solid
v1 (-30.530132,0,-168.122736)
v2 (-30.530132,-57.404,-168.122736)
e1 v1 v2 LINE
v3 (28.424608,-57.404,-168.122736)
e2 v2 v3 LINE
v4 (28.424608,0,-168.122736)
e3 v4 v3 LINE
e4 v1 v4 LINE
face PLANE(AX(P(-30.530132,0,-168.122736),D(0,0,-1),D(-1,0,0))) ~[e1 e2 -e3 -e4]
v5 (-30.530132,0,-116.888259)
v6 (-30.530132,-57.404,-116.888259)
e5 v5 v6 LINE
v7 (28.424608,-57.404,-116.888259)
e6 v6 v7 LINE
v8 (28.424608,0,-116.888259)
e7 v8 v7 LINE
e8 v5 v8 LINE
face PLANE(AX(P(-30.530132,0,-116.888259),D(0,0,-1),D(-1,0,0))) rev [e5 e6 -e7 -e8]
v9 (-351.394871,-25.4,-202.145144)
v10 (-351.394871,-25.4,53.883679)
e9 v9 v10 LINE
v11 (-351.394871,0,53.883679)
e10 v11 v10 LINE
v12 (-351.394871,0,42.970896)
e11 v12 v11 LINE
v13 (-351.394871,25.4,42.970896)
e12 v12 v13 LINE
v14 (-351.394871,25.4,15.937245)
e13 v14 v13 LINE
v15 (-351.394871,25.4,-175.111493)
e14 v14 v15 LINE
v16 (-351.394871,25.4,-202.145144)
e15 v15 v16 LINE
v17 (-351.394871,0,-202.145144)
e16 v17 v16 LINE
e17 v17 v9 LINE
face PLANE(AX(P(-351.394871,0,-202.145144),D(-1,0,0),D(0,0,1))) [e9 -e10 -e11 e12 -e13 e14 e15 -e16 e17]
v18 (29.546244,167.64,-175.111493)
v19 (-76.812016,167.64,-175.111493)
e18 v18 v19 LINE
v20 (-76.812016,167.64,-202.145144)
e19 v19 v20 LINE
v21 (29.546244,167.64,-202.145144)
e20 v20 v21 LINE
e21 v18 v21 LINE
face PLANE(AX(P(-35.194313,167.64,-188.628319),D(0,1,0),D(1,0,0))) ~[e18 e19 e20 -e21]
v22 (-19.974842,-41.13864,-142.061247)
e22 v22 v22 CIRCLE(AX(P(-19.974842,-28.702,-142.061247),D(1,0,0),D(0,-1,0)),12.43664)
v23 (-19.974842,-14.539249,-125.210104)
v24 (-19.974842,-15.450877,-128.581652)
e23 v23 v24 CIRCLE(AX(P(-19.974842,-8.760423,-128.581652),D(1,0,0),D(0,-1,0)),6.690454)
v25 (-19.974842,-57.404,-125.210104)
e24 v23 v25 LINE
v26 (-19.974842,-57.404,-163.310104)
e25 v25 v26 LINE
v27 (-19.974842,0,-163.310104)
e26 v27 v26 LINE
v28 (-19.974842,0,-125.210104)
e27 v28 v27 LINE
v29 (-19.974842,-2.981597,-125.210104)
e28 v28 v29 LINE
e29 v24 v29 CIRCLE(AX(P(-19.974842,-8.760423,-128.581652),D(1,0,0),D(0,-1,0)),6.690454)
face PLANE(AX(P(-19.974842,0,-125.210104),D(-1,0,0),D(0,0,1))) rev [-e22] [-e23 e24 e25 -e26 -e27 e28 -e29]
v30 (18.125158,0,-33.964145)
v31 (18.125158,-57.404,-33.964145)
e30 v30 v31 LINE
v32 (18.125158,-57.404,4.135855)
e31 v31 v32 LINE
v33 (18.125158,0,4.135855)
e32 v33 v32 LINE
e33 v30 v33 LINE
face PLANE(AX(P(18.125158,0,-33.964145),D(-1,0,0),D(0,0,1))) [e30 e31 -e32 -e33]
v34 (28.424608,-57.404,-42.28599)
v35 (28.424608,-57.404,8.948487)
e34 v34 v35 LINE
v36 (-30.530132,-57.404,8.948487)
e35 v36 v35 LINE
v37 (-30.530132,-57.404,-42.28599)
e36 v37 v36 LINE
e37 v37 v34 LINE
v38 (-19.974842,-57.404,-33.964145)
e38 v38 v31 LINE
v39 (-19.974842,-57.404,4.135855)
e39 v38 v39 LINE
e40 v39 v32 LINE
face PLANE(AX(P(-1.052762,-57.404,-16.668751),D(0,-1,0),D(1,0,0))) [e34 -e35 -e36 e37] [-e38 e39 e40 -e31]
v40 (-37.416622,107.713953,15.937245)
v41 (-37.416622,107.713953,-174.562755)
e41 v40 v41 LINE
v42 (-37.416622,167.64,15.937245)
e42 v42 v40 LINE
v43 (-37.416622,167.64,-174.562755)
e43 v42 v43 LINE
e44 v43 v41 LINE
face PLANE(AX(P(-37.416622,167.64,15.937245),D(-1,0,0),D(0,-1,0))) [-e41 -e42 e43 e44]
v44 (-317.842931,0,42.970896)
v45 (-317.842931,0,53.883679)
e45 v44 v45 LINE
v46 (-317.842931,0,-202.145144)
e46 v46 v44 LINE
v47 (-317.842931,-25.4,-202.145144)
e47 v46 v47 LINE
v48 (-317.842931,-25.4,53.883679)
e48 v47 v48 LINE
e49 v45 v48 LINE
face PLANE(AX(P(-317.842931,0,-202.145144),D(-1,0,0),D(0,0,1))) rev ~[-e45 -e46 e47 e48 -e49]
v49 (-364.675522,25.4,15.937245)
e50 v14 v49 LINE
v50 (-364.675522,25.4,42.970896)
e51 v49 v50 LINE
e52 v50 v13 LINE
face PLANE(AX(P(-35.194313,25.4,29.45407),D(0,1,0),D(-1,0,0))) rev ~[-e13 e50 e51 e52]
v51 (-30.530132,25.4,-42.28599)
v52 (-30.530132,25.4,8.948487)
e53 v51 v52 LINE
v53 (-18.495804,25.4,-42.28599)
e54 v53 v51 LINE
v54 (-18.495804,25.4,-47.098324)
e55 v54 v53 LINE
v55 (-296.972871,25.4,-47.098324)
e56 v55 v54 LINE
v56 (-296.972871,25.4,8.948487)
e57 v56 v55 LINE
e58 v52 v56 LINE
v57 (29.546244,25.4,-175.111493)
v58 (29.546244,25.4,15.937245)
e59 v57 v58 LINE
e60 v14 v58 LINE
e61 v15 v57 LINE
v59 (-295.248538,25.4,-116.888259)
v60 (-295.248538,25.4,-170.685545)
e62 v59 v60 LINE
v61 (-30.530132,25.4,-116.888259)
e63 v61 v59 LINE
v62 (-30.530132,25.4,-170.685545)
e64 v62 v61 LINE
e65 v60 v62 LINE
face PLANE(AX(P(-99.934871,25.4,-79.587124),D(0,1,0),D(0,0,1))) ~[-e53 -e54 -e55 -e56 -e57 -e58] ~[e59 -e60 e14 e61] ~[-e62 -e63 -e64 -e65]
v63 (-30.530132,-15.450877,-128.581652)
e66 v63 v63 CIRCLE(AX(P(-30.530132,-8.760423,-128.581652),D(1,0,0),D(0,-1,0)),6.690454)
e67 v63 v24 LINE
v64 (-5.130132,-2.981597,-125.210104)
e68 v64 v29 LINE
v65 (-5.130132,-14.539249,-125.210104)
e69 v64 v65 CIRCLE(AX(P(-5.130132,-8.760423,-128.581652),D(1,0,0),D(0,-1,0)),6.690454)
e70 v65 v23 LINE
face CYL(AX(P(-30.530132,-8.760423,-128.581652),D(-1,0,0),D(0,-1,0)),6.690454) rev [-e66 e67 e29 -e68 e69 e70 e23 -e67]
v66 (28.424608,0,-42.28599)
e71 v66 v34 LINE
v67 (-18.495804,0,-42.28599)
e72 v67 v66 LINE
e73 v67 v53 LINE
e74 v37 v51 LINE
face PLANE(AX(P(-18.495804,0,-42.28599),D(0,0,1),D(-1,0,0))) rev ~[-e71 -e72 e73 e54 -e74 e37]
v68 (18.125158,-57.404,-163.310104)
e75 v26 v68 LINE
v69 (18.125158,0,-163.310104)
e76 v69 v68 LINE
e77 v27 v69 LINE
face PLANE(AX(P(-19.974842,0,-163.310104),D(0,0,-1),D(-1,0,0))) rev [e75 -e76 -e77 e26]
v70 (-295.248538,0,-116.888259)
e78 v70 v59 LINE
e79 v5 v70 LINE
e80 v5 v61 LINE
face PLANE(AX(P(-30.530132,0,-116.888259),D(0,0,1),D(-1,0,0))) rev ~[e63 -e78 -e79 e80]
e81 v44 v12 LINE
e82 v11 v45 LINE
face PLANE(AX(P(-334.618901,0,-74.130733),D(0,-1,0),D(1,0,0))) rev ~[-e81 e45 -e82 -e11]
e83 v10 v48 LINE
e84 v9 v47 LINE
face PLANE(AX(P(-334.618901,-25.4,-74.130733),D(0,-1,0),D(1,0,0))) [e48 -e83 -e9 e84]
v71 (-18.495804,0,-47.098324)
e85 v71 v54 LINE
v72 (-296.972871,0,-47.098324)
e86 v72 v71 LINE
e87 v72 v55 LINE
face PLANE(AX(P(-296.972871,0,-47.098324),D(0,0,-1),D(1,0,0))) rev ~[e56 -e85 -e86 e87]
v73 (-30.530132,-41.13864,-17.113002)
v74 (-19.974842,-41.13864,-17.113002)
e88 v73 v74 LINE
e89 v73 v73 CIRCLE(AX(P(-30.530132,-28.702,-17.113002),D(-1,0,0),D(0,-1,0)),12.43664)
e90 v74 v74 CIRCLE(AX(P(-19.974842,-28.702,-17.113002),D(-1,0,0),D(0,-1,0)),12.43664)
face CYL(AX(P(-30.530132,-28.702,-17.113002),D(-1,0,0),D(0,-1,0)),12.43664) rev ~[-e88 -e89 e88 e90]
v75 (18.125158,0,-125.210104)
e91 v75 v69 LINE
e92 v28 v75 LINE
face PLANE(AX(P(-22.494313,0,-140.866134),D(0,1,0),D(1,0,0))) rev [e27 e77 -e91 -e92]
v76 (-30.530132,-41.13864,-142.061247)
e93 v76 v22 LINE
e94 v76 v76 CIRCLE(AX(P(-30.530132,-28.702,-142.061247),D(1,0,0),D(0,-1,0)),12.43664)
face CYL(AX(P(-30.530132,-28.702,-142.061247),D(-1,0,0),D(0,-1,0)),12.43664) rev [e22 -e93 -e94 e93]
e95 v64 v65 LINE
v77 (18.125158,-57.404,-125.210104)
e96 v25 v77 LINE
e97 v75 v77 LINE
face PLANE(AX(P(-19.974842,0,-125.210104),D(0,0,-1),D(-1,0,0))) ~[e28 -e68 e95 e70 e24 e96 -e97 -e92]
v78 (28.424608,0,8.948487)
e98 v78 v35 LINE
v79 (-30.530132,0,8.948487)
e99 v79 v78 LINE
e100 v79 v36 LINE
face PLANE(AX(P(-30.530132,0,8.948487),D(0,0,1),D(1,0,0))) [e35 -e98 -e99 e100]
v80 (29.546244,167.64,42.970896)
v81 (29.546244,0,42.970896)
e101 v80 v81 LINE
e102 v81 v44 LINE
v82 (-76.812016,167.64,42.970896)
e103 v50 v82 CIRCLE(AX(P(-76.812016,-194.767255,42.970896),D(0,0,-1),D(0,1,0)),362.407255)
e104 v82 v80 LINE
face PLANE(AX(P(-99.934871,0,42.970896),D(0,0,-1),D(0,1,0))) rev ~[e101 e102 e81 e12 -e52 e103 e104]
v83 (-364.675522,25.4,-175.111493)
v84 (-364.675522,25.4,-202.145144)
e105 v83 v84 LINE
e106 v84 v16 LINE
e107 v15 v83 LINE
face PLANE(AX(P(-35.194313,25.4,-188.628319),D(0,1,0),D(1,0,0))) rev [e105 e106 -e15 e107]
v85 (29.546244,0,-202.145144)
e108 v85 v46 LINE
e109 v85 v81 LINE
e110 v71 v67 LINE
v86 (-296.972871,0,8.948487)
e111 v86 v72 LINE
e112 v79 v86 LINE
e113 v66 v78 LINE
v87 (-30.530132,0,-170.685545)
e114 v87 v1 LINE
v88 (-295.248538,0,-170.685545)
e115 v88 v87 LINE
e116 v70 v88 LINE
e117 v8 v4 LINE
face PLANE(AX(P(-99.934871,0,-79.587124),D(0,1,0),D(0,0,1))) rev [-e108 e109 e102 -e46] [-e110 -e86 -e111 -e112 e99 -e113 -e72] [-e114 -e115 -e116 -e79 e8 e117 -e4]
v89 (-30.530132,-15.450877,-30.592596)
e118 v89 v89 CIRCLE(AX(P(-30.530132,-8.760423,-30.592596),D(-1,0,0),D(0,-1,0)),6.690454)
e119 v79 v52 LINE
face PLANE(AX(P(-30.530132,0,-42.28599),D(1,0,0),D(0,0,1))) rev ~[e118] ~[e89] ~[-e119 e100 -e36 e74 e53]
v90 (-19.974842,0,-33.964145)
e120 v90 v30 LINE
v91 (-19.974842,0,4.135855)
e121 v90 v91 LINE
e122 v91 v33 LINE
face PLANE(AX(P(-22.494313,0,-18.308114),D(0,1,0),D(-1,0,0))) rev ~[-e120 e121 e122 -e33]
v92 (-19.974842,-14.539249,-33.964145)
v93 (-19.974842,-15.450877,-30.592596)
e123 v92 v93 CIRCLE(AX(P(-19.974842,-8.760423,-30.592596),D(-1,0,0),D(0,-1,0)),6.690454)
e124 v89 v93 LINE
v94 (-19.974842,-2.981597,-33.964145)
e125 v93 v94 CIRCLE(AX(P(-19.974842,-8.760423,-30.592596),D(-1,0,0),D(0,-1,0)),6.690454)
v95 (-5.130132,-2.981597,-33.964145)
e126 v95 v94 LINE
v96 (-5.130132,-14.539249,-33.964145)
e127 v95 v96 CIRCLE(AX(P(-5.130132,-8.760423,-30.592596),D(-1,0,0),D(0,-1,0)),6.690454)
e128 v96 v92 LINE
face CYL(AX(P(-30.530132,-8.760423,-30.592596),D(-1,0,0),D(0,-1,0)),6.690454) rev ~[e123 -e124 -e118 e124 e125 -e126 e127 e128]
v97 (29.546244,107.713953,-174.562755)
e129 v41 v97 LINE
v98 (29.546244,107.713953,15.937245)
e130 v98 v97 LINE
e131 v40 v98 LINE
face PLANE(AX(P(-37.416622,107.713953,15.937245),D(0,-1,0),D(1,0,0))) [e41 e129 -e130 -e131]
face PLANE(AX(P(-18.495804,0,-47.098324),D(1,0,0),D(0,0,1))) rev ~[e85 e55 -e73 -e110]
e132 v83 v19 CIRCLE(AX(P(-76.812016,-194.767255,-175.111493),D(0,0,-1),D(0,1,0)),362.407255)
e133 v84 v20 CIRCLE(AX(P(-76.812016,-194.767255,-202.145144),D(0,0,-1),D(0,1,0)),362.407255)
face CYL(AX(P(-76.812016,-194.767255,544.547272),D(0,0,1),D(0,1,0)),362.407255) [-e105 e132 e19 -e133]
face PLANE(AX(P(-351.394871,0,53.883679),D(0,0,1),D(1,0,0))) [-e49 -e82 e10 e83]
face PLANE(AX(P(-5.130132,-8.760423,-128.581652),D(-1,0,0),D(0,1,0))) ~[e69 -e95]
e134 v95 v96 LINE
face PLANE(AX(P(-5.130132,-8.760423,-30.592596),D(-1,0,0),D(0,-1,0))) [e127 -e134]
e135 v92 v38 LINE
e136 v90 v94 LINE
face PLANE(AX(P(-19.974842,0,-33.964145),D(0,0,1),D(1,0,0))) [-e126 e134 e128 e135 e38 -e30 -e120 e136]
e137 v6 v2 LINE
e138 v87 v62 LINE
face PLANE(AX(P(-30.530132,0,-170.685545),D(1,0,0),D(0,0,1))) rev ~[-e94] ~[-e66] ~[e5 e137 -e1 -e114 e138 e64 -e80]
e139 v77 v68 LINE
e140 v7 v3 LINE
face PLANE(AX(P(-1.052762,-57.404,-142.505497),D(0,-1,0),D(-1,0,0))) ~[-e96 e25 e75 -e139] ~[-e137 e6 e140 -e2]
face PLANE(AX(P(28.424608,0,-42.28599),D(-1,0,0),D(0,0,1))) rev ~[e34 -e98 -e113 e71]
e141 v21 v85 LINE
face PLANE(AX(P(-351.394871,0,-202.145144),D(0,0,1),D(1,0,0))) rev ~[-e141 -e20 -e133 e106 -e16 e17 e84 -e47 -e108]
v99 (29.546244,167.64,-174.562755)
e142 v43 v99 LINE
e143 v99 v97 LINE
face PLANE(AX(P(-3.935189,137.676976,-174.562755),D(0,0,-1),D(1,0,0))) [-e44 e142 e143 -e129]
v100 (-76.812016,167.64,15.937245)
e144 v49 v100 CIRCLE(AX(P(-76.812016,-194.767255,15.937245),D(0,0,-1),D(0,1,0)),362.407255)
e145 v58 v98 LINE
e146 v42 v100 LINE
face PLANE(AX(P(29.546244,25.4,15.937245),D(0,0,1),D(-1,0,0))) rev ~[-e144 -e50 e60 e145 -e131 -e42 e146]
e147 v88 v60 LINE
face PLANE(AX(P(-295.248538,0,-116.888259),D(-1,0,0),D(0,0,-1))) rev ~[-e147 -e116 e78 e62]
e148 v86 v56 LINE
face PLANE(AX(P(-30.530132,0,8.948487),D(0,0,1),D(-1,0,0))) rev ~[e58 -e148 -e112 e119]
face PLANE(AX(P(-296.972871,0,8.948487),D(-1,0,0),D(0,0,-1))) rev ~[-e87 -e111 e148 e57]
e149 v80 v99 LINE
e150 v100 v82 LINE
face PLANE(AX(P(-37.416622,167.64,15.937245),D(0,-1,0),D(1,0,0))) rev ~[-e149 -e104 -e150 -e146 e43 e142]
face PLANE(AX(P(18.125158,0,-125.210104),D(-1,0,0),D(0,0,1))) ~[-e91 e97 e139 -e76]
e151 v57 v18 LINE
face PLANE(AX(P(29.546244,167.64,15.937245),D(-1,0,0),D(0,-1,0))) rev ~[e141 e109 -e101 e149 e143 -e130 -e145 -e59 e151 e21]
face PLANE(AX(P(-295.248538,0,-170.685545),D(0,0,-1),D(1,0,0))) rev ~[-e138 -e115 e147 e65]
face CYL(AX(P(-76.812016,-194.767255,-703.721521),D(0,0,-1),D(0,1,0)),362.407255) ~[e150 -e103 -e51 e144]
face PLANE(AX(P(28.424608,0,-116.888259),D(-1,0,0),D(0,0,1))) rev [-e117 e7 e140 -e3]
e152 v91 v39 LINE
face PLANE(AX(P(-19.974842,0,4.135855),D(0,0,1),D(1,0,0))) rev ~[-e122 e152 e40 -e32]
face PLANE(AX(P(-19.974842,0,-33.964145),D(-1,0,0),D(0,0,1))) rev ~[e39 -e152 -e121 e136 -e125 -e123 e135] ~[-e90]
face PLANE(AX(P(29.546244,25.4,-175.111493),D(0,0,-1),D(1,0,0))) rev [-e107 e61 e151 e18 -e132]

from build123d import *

# Parameters (mm, degrees)
F0_W         = 58.9547399431
F0_H         = 51.2344771996
F0_W_2       = 38.1
F0_H_2       = 38.1
F1_DEPTH     = 57.404
F2_R         = 12.4366404678
F3_DEPTH     = 25.4
F4_W         = 104.0811147541
F4_H         = 122.5580200553
F5_DEPTH     = 25.4
F6_DEPTH     = 25.4
F7_R         = 6.690453714
F8_DEPTH     = 25.4
F9_W         = 129.4811147541
F9_H         = 27.0336512476
F9_W_2       = 264.7406511664
F10_DEPTH    = 142.24
F11_T1_DEPTH = 1466.3511823856
F12_DEPTH    = 251.46
F16_W        = 33.5519401288
F16_H        = 256.0288235545
F17_DEPTH    = 25.4
F19_DEPTH    = 25.4
F20_W        = 66.9628661126
F20_H        = 59.9260473394
F21_DEPTH    = 190.5


# Not quite as in the source:
# - a fillet or chamfer that OpenCascade refuses, or shapes differently, is made with other operations: its cross-section is extruded or revolved along the edge and cut away or added
# - a feature of the source that left no trace in its solid (it failed there, or was rolled back) is left out


with BuildPart() as f1:
    # F0 (on Front) → F1 (new body)
    with BuildSketch(Plane.XZ):
        with Locations((-1.0527623817, -16.6687513702)):
            Rectangle(F0_W, F0_H)
        with Locations((-0.9248415082, -14.9141447619)):
            Rectangle(F0_W_2, F0_H_2, mode=Mode.SUBTRACT)
    extrude(amount=F1_DEPTH)

    # F2 (on face) → F3 (cut)
    with BuildSketch(Plane(origin=(-30.5301323533, 0, 0), x_dir=(0, -1, 0), z_dir=(-1, 0, 0))):
        with Locations((28.702, -17.1130020171)):
            Circle(F2_R)
    extrude(amount=-F3_DEPTH, mode=Mode.SUBTRACT)

    # F4 (on face) → F5 (join)
    with BuildSketch(Plane(origin=(0, 0, 0), x_dir=(-1, 0, 0), z_dir=(0, 1, 0))):
        with Locations((22.4943133071, -18.3081142604)):
            Rectangle(F4_W, F4_H)
    extrude(amount=F5_DEPTH)

    # F6 (add): a face of the model
    f6_faces = [f1.faces().sort_by_distance(p)[0] for p in [
        (-74.5348706841, 12.7, -18.3081142604),
    ]]
    extrude(f6_faces, amount=F6_DEPTH)

    # F7 (on face) → F8 (cut)
    with BuildSketch(Plane(origin=(-30.5301323533, 0, 0), x_dir=(0, -1, 0), z_dir=(-1, 0, 0))):
        with Locations((8.7604233995, -30.5925961584)):
            Circle(F7_R)
    extrude(amount=-F8_DEPTH, mode=Mode.SUBTRACT)

    # F9 (on face) → F10 (join)
    with BuildSketch(Plane(origin=(0, 25.4, 0), x_dir=(-1, 0, 0), z_dir=(0, 1, 0))):
        with Locations((35.1943133071, 29.4540701434)):
            Rectangle(F9_W, F9_H)
        with Locations((232.3051962674, 29.4540701434)):
            Rectangle(F9_W_2, F9_H)
    extrude(amount=F10_DEPTH)

    # F11: fillet of radius 362.4072547021 on 1 edges, made by hand

    # F11_s2 → F11_t1 (cut)
    with BuildSketch(Plane.XY.offset(-703.7215210494)):
        with BuildLine():
            ThreePointArc((-76.812015623, 167.64), (-237.3561028838, 130.139830949), (-364.6755218506, 25.4))
            Line((-364.6755218506, 25.4), (-364.6755218506, 167.64))
            Line((-364.6755218506, 167.64), (-76.812015623, 167.64))
        make_face()
    extrude(amount=F11_T1_DEPTH, mode=Mode.SUBTRACT)

    # F12 (add): a face of the model
    f12_faces = [f1.faces().sort_by_distance(p)[0] for p in [
        (-99.9348706841, 12.7, -18.3081142604),
    ]]
    extrude(f12_faces, amount=F12_DEPTH)

    # F15: F1 across face


with BuildPart() as f1_1:
    add(f1.part)
    add(f1.part.mirror(Plane(origin=(-160.9243133071, 12.7, -79.5871242881), x_dir=(1, 0, 0), z_dir=(0, 0, -1))))

    # F16 (on face) → F17 (join)
    with BuildSketch(Plane.XZ):
        with Locations((-334.6189006197, -74.1307325661)):
            Rectangle(F16_W, F16_H)
    extrude(amount=F17_DEPTH)

    # F18 (on face) → F19 (cut)
    with BuildSketch(Plane.XZ):
        Polygon((-295.2485382557, -116.8882586062), (-295.2485382557, -170.68554461), (-30.5301323533, -170.68554461), (-30.5301323533, -168.1227358058), (-30.5301323533, -116.8882586062), align=None)
        Polygon((-296.9728708267, 8.9484872296), (-296.9728708267, -47.0983237028), (-18.4958036989, -47.0983237028), (-18.4958036989, -42.28598997), (-30.5301323533, -42.28598997), (-30.5301323533, 8.9484872296), align=None)
    extrude(amount=-F19_DEPTH, mode=Mode.SUBTRACT)

    # F20 (on face) → F21 (join)
    with BuildSketch(Plane(origin=(0, 0, 15.9372445196), x_dir=(1, 0, 0), z_dir=(0, 0, -1))):
        with Locations((-3.9351889864, -137.6769763303)):
            Rectangle(F20_W, F20_H)
    extrude(amount=F21_DEPTH)


solid = f1_1.part
